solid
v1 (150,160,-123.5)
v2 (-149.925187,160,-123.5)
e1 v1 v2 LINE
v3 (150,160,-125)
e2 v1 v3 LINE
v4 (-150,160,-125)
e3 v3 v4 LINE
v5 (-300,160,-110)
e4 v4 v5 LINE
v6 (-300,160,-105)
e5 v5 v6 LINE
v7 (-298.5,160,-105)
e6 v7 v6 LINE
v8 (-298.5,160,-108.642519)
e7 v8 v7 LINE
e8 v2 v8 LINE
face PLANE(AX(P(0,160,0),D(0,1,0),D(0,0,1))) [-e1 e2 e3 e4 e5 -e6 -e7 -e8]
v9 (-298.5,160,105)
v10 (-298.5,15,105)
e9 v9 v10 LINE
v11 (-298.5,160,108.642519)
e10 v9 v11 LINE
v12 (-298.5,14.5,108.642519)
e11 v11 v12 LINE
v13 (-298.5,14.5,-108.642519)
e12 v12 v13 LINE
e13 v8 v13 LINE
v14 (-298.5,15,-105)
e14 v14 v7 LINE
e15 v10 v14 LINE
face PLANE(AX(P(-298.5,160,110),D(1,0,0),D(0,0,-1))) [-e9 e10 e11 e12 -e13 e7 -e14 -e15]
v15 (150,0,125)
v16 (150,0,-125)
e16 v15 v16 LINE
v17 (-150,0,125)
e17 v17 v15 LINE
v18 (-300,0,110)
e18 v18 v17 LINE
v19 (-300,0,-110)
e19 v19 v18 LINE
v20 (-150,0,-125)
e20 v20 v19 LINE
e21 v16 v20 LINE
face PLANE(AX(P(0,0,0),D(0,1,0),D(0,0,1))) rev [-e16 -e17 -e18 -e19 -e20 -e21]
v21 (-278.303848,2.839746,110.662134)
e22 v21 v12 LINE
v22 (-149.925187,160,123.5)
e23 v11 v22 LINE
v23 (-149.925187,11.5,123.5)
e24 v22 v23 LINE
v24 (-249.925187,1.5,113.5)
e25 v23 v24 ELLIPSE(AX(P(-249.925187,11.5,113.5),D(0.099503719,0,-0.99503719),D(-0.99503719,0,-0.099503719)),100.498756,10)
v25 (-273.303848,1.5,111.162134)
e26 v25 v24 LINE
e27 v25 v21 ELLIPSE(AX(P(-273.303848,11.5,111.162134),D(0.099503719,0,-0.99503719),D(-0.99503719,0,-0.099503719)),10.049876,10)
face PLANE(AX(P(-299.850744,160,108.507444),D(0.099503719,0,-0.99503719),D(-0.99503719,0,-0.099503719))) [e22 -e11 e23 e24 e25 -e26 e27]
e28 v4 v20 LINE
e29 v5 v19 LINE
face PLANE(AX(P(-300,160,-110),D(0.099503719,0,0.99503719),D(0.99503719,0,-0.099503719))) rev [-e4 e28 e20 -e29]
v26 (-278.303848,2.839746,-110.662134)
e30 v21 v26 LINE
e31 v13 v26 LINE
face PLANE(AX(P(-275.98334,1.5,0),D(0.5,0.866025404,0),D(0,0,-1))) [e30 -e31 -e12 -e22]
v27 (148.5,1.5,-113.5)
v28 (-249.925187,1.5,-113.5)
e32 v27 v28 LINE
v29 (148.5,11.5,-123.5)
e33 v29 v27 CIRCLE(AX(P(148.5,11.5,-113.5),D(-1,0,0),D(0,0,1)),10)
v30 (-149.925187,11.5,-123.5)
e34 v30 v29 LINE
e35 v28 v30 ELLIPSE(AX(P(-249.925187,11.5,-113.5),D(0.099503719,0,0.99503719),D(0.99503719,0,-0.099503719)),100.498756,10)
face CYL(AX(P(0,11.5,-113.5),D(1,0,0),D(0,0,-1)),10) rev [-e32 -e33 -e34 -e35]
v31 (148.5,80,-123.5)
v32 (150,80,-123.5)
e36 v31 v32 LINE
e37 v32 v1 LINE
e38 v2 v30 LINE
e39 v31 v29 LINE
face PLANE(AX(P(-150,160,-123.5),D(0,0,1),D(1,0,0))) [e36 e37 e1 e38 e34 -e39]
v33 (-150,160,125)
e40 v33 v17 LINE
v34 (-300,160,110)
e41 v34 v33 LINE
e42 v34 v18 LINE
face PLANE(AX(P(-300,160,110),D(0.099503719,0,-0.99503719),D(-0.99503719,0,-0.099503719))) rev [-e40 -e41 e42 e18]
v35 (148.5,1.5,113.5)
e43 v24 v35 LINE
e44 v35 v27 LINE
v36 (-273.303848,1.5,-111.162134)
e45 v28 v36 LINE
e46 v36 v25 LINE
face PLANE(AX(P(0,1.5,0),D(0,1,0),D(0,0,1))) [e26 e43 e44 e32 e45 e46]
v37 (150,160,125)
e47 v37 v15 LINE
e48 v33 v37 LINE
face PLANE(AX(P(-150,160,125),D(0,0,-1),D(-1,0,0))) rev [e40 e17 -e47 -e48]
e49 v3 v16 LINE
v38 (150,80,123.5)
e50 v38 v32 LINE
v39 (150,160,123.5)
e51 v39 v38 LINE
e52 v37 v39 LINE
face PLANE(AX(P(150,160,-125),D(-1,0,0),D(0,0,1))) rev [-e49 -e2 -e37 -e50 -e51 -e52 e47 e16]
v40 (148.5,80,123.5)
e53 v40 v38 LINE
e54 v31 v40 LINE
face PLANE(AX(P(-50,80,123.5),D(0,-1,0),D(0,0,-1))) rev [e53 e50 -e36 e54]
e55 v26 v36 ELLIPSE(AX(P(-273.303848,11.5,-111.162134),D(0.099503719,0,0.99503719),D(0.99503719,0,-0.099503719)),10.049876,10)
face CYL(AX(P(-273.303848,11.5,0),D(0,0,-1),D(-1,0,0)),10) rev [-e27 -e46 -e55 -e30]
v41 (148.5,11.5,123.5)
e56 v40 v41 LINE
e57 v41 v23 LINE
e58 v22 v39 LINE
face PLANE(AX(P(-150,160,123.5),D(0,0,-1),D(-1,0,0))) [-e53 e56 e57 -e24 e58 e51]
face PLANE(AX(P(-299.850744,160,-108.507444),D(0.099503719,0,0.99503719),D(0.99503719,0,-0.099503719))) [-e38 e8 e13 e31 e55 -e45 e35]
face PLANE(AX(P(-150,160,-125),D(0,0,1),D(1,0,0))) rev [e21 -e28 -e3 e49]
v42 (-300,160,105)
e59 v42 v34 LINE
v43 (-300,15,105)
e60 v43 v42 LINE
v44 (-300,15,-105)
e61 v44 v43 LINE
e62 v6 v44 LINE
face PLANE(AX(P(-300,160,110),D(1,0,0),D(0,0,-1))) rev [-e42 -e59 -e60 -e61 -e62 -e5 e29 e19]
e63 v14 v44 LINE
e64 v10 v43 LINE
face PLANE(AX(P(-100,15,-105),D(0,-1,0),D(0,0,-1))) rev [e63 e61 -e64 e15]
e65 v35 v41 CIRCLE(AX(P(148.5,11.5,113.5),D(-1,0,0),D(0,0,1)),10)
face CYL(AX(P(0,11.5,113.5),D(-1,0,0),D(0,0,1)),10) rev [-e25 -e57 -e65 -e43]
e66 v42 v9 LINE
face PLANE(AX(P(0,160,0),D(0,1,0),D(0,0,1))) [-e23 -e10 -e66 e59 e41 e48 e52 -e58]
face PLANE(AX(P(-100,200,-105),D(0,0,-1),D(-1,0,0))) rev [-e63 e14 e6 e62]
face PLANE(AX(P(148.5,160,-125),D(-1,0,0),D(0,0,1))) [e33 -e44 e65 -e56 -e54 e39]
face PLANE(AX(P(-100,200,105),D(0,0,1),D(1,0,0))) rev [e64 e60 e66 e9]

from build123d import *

# Parameters (mm, degrees)
EXTRUDE_1_DEPTH     = 160
SHELL_1_T           = -1.5
SKETCH_2_W          = 210
SKETCH_2_H          = 185
CUT_EXTRUDE_1_DEPTH = 200
CHAMFER_1_SIZE      = 13
CHAMFER_1_SIZE2     = 22.516660498
SKETCH_6_W          = 247
SKETCH_6_H          = 80
CUT_EXTRUDE_2_DEPTH = 200
FILLET_1_R          = 10
FILLET_2_R          = 10


with BuildPart() as part:
    # 草图1 → 凸台-拉伸1 (new body)
    with BuildSketch(Plane(origin=(0, 0, 0), x_dir=(1, 0, 0), z_dir=(0, 1, 0))):
        Polygon((-150, 125), (150, 125), (150, -125), (-150, -125), (-300, -110), (-300, 110), align=None)
    extrude(amount=EXTRUDE_1_DEPTH)

    # 抽壳1
    shell_1_openings = [part.faces().sort_by_distance(p)[0] for p in [
        (-71.428571429, 160, 0),
    ]]
    offset(amount=SHELL_1_T, openings=shell_1_openings, kind=Kind.INTERSECTION)

    # 草图2 → 切除-拉伸1 (cut)
    with BuildSketch(Plane.ZY.offset(300)):
        with Locations((0, 107.5)):
            Rectangle(SKETCH_2_W, SKETCH_2_H)
    extrude(amount=-CUT_EXTRUDE_1_DEPTH, mode=Mode.SUBTRACT)

    # 倒角1
    chamfer_1_edges = [part.edges().sort_by_distance(p)[0] for p in [
        (-298.5, 1.5, 0),
    ]]
    chamfer_1_side = [part.faces().sort_by_distance(p)[0] for p in [
        (-298.5, 80.75, 105.953001276),
    ]]
    chamfer(chamfer_1_edges, length=CHAMFER_1_SIZE, length2=CHAMFER_1_SIZE2, reference=chamfer_1_side[0])

    # 草图6 → 切除-拉伸2 (cut)
    with BuildSketch(Plane(origin=(150, 0, 0), x_dir=(0, 0, -1), z_dir=(1, 0, 0))):
        with Locations((0, 120)):
            Rectangle(SKETCH_6_W, SKETCH_6_H)
    extrude(amount=-CUT_EXTRUDE_2_DEPTH, mode=Mode.SUBTRACT)

    # 圆角1
    fillet_1_edges = [part.edges().sort_by_distance(p)[0] for p in [
        (-275.983339502, 1.5, 0),
    ]]
    fillet(fillet_1_edges, radius=FILLET_1_R)

    # 圆角2
    # the kernel refuses this fillet: 10 mm, written as the material it adds along each edge
    with BuildSketch(Plane(origin=(148.5, 1.5, -123.5), x_dir=(0, 0, 1), z_dir=(-1, 0, 0))) as fillet_2_piece_1_section:
        with BuildLine():
            CenterArc((FILLET_2_R, FILLET_2_R), FILLET_2_R, 180, 90)
            Line((0, FILLET_2_R), (0, 0))
            Line((0, 0), (FILLET_2_R, 0))
        make_face()
    fillet_2_piece_1 = extrude(amount=423.425186568, mode=Mode.PRIVATE)
    fillet_2_piece_1 = split(fillet_2_piece_1, bisect_by=Plane(origin=(145.545295182, 1.5, -153.047048175), z_dir=(0.09950371902099917, 0, 0.9950371902099892)), keep=Keep.TOP, mode=Mode.PRIVATE)
    add(fillet_2_piece_1)
    with BuildSketch(Plane(origin=(-274.925186568, 1.5, 123.5), x_dir=(0, 0, -1), z_dir=(1, 0, 0))) as fillet_2_piece_2_section:
        with BuildLine():
            CenterArc((FILLET_2_R, FILLET_2_R), FILLET_2_R, 180, 90)
            Line((0, FILLET_2_R), (0, 0))
            Line((0, 0), (FILLET_2_R, 0))
        make_face()
    fillet_2_piece_2 = extrude(amount=423.425186568, mode=Mode.PRIVATE)
    fillet_2_piece_2 = split(fillet_2_piece_2, bisect_by=Plane(origin=(-273.687562806, 1.5, 111.123762376), z_dir=(0.09950371902099844, 0, -0.9950371902099893)), keep=Keep.TOP, mode=Mode.PRIVATE)
    add(fillet_2_piece_2)


solid = part.part
